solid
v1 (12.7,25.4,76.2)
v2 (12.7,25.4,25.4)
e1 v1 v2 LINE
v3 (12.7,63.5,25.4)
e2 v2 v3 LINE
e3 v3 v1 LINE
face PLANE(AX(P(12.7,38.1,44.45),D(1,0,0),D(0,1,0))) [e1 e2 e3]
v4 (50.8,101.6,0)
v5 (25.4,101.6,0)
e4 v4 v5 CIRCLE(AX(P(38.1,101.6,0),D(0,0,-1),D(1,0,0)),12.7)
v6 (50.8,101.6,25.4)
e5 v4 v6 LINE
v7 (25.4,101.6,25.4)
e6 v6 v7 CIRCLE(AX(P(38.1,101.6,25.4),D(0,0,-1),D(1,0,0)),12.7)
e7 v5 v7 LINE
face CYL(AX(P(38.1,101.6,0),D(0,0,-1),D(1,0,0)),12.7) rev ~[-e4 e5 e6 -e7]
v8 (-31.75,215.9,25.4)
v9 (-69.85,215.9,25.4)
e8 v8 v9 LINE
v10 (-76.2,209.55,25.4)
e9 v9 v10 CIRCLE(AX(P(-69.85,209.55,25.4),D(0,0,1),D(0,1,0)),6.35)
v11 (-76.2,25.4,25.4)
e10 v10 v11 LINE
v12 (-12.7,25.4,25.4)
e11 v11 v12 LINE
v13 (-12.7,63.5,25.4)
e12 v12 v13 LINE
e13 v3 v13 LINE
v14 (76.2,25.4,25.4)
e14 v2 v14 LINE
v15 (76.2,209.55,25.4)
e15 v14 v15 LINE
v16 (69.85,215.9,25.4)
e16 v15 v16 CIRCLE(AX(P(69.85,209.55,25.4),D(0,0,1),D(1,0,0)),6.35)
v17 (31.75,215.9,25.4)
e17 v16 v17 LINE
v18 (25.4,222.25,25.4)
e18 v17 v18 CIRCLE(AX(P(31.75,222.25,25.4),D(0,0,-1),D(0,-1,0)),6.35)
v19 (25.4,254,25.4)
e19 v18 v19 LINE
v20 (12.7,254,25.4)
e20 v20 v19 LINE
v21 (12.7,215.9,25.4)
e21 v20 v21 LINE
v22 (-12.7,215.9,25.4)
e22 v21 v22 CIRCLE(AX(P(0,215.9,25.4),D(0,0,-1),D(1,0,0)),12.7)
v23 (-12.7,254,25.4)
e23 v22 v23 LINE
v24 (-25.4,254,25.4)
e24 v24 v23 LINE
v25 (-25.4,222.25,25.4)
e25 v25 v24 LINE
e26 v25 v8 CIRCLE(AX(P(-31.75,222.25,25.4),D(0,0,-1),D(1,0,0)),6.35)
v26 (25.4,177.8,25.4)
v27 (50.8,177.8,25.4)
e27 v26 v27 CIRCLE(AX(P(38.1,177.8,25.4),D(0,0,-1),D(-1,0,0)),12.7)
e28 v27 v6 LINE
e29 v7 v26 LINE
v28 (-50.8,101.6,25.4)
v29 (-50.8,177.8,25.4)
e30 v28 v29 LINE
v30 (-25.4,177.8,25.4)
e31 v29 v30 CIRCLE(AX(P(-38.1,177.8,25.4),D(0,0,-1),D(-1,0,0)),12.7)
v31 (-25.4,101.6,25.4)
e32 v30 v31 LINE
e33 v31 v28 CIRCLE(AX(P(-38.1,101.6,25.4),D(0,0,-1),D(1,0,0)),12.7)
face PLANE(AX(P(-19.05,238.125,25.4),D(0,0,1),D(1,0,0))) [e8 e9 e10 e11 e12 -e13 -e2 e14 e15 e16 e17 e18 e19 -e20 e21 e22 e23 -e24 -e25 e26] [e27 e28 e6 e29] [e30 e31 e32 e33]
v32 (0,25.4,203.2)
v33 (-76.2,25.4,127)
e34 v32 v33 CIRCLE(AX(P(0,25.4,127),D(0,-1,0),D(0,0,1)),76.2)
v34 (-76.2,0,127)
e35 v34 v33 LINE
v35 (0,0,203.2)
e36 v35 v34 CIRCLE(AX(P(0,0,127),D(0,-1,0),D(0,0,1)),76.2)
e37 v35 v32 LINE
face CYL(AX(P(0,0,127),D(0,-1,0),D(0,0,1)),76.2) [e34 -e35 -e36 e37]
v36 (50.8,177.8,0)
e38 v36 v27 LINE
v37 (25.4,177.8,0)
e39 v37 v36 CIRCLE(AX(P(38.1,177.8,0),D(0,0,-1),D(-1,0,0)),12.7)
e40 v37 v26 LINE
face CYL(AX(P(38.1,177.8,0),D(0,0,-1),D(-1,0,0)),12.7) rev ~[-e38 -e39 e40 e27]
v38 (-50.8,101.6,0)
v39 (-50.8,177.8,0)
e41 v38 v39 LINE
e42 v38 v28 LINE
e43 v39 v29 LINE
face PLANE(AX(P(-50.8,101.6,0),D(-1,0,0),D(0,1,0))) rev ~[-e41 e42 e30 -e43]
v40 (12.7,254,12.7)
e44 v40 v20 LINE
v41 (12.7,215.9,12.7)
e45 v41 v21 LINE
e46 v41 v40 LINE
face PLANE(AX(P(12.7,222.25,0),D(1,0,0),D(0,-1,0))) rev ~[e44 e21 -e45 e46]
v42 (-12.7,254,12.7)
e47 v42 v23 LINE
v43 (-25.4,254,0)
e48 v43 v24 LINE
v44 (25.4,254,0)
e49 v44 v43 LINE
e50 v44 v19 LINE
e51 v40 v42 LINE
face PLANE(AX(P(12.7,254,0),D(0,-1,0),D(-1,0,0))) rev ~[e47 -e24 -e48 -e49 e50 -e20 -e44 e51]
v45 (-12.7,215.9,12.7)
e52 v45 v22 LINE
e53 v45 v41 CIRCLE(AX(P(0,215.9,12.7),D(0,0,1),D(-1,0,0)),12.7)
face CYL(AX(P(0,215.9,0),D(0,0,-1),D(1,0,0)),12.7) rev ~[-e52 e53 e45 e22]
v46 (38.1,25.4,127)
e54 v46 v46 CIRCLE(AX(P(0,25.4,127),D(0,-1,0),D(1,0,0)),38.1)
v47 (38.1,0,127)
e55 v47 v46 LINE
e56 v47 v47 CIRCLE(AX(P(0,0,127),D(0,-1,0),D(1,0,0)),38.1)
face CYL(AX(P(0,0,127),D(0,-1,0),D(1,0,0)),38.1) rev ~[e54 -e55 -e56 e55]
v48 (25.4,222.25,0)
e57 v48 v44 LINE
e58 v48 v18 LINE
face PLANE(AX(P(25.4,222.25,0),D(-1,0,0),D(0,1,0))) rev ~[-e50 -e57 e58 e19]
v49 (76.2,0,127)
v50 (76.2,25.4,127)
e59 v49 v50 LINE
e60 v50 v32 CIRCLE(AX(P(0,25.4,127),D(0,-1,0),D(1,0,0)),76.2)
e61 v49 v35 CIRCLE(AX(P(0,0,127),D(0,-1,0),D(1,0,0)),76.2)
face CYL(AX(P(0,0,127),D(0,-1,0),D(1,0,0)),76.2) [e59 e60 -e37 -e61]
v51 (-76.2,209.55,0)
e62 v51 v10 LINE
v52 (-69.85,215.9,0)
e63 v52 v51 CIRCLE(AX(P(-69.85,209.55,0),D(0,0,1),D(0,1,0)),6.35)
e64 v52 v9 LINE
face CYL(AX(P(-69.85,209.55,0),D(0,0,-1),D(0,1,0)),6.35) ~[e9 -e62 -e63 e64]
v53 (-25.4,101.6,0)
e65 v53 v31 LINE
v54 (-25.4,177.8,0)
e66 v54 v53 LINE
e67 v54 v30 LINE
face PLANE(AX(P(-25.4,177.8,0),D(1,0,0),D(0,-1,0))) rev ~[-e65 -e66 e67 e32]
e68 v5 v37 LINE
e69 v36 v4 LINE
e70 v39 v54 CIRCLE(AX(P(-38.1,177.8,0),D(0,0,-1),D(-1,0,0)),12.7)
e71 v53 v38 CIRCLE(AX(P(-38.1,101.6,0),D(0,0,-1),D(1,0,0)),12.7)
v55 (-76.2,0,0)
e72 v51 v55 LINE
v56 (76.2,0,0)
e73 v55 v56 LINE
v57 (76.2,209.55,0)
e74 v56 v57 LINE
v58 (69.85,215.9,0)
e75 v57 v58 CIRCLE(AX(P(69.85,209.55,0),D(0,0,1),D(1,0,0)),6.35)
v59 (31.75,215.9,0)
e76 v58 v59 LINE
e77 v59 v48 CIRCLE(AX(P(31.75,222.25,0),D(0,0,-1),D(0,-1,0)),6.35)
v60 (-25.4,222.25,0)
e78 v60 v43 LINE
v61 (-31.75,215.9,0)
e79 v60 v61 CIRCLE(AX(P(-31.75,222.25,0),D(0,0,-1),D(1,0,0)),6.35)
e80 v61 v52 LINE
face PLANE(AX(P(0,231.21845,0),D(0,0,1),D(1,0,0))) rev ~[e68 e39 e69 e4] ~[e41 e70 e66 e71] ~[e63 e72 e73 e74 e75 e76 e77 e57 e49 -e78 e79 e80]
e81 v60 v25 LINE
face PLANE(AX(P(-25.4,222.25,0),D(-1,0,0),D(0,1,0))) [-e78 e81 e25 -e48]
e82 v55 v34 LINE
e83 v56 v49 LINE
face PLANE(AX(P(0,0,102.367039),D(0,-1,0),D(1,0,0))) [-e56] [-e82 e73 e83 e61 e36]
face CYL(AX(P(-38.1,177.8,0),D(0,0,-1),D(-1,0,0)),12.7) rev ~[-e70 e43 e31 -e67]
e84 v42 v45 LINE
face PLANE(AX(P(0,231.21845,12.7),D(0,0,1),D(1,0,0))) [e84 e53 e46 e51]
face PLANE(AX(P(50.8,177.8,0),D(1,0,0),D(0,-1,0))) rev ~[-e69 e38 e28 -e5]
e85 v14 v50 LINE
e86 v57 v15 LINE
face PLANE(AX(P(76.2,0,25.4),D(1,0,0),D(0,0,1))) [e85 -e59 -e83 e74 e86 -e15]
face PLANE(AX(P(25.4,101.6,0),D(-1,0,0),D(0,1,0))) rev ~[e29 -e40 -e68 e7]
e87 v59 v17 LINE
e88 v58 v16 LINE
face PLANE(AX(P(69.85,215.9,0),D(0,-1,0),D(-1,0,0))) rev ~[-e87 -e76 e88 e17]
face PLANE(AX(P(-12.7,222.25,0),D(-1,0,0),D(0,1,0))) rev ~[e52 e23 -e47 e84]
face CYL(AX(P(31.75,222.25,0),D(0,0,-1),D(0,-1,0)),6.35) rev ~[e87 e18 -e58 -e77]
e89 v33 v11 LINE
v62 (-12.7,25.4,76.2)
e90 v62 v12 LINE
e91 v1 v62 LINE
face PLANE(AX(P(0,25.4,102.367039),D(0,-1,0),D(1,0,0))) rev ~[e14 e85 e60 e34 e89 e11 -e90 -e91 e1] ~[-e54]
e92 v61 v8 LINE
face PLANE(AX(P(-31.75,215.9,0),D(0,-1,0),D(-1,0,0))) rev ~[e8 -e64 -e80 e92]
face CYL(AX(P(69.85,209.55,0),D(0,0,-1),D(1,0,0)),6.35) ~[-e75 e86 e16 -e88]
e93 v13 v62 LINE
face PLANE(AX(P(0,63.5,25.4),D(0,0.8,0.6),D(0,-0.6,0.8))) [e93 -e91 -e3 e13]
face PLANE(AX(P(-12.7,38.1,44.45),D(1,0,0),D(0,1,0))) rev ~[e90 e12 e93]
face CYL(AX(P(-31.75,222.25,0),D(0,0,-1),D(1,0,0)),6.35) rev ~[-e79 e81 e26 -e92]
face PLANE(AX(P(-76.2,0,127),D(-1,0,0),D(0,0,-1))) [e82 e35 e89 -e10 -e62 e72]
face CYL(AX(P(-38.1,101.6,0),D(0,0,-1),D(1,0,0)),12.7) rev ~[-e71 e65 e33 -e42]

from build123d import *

# Parameters (mm, degrees)
F1_DEPTH = 25.4
F0_W     = 12.7
F0_H     = 31.75
F2_DEPTH = 25.4
F4_DEPTH = 12.7
F6_R     = 38.1
F7_DEPTH = 25.4
F8_DEPTH = 12.7


# Not quite as in the source:
# - a feature names something its author has since deleted; it is built from what else it names


with BuildPart() as f1:
    # F0 (on Top) → F1 (new body)
    with BuildSketch(Plane.XY):
        with BuildLine():
            Line((-76.2, 209.55), (-76.2, 0))
            Line((-76.2, 0), (76.2, 0))
            Line((76.2, 0), (76.2, 209.55))
            ThreePointArc((76.2, 209.55), (74.3401280605, 214.0401280605), (69.85, 215.9))
            Line((69.85, 215.9), (31.75, 215.9))
            ThreePointArc((31.75, 215.9), (27.2598719395, 217.7598719395), (25.4, 222.25))
            Line((25.4, 222.25), (12.7, 222.25))
            Line((12.7, 222.25), (12.7, 215.9))
            ThreePointArc((12.7, 215.9), (0, 203.2), (-12.7, 215.9))
            Line((-12.7, 215.9), (-12.7, 222.25))
            Line((-12.7, 222.25), (-25.4, 222.25))
            ThreePointArc((-25.4, 222.25), (-27.2598719395, 217.7598719395), (-31.75, 215.9))
            Line((-31.75, 215.9), (-69.85, 215.9))
            ThreePointArc((-69.85, 215.9), (-74.3401280605, 214.0401280605), (-76.2, 209.55))
        make_face()
        with BuildLine():
            Line((-50.8, 101.6), (-50.8, 177.8))
            ThreePointArc((-50.8, 177.8), (-38.1, 190.5), (-25.4, 177.8))
            Line((-25.4, 177.8), (-25.4, 101.6))
            ThreePointArc((-25.4, 101.6), (-38.1, 88.9), (-50.8, 101.6))
        make_face(mode=Mode.SUBTRACT)
        with BuildLine():
            Line((25.4, 101.6), (25.4, 177.8))
            ThreePointArc((25.4, 177.8), (38.1, 190.5), (50.8, 177.8))
            Line((50.8, 177.8), (50.8, 101.6))
            ThreePointArc((50.8, 101.6), (38.1, 88.9), (25.4, 101.6))
        make_face(mode=Mode.SUBTRACT)
    extrude(amount=F1_DEPTH)

    # F0 (on Top) → F2 (join)
    with BuildSketch(Plane.XY):
        with Locations((-19.05, 238.125)):
            Rectangle(F0_W, F0_H)
        with Locations((19.05, 238.125)):
            Rectangle(F0_W, F0_H)
    extrude(amount=F2_DEPTH)

    # F3 (on Right) → F4 (join, symmetric)
    with BuildSketch(Plane.YZ):
        Polygon((25.4, 76.2), (25.4, 25.4), (63.5, 25.4), align=None)
    extrude(amount=F4_DEPTH, both=True)

    # F6 (on Front) → F7 (join)
    with BuildSketch(Plane.XZ):
        with BuildLine():
            Line((-76.2, 25.4), (76.2, 25.4))
            Line((76.2, 25.4), (76.2, 127))
            ThreePointArc((76.2, 127), (53.8815367264, 180.8815367264), (0, 203.2))
            ThreePointArc((0, 203.2), (-53.8815367264, 180.8815367264), (-76.2, 127))
            Line((-76.2, 127), (-76.2, 25.4))
        make_face()
        with Locations((0, 127)):
            Circle(F6_R, mode=Mode.SUBTRACT)
    extrude(amount=-F7_DEPTH)

    # F0 (on Top) → F8 (join)
    with BuildSketch(Plane.XY):
        with BuildLine():
            Line((-12.7, 254), (-12.7, 222.25))
            Line((-12.7, 222.25), (-12.7, 215.9))
            ThreePointArc((-12.7, 215.9), (0, 203.2), (12.7, 215.9))
            Line((12.7, 215.9), (12.7, 222.25))
            Line((12.7, 222.25), (12.7, 254))
            Line((12.7, 254), (-12.7, 254))
        make_face()
    extrude(amount=F8_DEPTH)


solid = f1.part
